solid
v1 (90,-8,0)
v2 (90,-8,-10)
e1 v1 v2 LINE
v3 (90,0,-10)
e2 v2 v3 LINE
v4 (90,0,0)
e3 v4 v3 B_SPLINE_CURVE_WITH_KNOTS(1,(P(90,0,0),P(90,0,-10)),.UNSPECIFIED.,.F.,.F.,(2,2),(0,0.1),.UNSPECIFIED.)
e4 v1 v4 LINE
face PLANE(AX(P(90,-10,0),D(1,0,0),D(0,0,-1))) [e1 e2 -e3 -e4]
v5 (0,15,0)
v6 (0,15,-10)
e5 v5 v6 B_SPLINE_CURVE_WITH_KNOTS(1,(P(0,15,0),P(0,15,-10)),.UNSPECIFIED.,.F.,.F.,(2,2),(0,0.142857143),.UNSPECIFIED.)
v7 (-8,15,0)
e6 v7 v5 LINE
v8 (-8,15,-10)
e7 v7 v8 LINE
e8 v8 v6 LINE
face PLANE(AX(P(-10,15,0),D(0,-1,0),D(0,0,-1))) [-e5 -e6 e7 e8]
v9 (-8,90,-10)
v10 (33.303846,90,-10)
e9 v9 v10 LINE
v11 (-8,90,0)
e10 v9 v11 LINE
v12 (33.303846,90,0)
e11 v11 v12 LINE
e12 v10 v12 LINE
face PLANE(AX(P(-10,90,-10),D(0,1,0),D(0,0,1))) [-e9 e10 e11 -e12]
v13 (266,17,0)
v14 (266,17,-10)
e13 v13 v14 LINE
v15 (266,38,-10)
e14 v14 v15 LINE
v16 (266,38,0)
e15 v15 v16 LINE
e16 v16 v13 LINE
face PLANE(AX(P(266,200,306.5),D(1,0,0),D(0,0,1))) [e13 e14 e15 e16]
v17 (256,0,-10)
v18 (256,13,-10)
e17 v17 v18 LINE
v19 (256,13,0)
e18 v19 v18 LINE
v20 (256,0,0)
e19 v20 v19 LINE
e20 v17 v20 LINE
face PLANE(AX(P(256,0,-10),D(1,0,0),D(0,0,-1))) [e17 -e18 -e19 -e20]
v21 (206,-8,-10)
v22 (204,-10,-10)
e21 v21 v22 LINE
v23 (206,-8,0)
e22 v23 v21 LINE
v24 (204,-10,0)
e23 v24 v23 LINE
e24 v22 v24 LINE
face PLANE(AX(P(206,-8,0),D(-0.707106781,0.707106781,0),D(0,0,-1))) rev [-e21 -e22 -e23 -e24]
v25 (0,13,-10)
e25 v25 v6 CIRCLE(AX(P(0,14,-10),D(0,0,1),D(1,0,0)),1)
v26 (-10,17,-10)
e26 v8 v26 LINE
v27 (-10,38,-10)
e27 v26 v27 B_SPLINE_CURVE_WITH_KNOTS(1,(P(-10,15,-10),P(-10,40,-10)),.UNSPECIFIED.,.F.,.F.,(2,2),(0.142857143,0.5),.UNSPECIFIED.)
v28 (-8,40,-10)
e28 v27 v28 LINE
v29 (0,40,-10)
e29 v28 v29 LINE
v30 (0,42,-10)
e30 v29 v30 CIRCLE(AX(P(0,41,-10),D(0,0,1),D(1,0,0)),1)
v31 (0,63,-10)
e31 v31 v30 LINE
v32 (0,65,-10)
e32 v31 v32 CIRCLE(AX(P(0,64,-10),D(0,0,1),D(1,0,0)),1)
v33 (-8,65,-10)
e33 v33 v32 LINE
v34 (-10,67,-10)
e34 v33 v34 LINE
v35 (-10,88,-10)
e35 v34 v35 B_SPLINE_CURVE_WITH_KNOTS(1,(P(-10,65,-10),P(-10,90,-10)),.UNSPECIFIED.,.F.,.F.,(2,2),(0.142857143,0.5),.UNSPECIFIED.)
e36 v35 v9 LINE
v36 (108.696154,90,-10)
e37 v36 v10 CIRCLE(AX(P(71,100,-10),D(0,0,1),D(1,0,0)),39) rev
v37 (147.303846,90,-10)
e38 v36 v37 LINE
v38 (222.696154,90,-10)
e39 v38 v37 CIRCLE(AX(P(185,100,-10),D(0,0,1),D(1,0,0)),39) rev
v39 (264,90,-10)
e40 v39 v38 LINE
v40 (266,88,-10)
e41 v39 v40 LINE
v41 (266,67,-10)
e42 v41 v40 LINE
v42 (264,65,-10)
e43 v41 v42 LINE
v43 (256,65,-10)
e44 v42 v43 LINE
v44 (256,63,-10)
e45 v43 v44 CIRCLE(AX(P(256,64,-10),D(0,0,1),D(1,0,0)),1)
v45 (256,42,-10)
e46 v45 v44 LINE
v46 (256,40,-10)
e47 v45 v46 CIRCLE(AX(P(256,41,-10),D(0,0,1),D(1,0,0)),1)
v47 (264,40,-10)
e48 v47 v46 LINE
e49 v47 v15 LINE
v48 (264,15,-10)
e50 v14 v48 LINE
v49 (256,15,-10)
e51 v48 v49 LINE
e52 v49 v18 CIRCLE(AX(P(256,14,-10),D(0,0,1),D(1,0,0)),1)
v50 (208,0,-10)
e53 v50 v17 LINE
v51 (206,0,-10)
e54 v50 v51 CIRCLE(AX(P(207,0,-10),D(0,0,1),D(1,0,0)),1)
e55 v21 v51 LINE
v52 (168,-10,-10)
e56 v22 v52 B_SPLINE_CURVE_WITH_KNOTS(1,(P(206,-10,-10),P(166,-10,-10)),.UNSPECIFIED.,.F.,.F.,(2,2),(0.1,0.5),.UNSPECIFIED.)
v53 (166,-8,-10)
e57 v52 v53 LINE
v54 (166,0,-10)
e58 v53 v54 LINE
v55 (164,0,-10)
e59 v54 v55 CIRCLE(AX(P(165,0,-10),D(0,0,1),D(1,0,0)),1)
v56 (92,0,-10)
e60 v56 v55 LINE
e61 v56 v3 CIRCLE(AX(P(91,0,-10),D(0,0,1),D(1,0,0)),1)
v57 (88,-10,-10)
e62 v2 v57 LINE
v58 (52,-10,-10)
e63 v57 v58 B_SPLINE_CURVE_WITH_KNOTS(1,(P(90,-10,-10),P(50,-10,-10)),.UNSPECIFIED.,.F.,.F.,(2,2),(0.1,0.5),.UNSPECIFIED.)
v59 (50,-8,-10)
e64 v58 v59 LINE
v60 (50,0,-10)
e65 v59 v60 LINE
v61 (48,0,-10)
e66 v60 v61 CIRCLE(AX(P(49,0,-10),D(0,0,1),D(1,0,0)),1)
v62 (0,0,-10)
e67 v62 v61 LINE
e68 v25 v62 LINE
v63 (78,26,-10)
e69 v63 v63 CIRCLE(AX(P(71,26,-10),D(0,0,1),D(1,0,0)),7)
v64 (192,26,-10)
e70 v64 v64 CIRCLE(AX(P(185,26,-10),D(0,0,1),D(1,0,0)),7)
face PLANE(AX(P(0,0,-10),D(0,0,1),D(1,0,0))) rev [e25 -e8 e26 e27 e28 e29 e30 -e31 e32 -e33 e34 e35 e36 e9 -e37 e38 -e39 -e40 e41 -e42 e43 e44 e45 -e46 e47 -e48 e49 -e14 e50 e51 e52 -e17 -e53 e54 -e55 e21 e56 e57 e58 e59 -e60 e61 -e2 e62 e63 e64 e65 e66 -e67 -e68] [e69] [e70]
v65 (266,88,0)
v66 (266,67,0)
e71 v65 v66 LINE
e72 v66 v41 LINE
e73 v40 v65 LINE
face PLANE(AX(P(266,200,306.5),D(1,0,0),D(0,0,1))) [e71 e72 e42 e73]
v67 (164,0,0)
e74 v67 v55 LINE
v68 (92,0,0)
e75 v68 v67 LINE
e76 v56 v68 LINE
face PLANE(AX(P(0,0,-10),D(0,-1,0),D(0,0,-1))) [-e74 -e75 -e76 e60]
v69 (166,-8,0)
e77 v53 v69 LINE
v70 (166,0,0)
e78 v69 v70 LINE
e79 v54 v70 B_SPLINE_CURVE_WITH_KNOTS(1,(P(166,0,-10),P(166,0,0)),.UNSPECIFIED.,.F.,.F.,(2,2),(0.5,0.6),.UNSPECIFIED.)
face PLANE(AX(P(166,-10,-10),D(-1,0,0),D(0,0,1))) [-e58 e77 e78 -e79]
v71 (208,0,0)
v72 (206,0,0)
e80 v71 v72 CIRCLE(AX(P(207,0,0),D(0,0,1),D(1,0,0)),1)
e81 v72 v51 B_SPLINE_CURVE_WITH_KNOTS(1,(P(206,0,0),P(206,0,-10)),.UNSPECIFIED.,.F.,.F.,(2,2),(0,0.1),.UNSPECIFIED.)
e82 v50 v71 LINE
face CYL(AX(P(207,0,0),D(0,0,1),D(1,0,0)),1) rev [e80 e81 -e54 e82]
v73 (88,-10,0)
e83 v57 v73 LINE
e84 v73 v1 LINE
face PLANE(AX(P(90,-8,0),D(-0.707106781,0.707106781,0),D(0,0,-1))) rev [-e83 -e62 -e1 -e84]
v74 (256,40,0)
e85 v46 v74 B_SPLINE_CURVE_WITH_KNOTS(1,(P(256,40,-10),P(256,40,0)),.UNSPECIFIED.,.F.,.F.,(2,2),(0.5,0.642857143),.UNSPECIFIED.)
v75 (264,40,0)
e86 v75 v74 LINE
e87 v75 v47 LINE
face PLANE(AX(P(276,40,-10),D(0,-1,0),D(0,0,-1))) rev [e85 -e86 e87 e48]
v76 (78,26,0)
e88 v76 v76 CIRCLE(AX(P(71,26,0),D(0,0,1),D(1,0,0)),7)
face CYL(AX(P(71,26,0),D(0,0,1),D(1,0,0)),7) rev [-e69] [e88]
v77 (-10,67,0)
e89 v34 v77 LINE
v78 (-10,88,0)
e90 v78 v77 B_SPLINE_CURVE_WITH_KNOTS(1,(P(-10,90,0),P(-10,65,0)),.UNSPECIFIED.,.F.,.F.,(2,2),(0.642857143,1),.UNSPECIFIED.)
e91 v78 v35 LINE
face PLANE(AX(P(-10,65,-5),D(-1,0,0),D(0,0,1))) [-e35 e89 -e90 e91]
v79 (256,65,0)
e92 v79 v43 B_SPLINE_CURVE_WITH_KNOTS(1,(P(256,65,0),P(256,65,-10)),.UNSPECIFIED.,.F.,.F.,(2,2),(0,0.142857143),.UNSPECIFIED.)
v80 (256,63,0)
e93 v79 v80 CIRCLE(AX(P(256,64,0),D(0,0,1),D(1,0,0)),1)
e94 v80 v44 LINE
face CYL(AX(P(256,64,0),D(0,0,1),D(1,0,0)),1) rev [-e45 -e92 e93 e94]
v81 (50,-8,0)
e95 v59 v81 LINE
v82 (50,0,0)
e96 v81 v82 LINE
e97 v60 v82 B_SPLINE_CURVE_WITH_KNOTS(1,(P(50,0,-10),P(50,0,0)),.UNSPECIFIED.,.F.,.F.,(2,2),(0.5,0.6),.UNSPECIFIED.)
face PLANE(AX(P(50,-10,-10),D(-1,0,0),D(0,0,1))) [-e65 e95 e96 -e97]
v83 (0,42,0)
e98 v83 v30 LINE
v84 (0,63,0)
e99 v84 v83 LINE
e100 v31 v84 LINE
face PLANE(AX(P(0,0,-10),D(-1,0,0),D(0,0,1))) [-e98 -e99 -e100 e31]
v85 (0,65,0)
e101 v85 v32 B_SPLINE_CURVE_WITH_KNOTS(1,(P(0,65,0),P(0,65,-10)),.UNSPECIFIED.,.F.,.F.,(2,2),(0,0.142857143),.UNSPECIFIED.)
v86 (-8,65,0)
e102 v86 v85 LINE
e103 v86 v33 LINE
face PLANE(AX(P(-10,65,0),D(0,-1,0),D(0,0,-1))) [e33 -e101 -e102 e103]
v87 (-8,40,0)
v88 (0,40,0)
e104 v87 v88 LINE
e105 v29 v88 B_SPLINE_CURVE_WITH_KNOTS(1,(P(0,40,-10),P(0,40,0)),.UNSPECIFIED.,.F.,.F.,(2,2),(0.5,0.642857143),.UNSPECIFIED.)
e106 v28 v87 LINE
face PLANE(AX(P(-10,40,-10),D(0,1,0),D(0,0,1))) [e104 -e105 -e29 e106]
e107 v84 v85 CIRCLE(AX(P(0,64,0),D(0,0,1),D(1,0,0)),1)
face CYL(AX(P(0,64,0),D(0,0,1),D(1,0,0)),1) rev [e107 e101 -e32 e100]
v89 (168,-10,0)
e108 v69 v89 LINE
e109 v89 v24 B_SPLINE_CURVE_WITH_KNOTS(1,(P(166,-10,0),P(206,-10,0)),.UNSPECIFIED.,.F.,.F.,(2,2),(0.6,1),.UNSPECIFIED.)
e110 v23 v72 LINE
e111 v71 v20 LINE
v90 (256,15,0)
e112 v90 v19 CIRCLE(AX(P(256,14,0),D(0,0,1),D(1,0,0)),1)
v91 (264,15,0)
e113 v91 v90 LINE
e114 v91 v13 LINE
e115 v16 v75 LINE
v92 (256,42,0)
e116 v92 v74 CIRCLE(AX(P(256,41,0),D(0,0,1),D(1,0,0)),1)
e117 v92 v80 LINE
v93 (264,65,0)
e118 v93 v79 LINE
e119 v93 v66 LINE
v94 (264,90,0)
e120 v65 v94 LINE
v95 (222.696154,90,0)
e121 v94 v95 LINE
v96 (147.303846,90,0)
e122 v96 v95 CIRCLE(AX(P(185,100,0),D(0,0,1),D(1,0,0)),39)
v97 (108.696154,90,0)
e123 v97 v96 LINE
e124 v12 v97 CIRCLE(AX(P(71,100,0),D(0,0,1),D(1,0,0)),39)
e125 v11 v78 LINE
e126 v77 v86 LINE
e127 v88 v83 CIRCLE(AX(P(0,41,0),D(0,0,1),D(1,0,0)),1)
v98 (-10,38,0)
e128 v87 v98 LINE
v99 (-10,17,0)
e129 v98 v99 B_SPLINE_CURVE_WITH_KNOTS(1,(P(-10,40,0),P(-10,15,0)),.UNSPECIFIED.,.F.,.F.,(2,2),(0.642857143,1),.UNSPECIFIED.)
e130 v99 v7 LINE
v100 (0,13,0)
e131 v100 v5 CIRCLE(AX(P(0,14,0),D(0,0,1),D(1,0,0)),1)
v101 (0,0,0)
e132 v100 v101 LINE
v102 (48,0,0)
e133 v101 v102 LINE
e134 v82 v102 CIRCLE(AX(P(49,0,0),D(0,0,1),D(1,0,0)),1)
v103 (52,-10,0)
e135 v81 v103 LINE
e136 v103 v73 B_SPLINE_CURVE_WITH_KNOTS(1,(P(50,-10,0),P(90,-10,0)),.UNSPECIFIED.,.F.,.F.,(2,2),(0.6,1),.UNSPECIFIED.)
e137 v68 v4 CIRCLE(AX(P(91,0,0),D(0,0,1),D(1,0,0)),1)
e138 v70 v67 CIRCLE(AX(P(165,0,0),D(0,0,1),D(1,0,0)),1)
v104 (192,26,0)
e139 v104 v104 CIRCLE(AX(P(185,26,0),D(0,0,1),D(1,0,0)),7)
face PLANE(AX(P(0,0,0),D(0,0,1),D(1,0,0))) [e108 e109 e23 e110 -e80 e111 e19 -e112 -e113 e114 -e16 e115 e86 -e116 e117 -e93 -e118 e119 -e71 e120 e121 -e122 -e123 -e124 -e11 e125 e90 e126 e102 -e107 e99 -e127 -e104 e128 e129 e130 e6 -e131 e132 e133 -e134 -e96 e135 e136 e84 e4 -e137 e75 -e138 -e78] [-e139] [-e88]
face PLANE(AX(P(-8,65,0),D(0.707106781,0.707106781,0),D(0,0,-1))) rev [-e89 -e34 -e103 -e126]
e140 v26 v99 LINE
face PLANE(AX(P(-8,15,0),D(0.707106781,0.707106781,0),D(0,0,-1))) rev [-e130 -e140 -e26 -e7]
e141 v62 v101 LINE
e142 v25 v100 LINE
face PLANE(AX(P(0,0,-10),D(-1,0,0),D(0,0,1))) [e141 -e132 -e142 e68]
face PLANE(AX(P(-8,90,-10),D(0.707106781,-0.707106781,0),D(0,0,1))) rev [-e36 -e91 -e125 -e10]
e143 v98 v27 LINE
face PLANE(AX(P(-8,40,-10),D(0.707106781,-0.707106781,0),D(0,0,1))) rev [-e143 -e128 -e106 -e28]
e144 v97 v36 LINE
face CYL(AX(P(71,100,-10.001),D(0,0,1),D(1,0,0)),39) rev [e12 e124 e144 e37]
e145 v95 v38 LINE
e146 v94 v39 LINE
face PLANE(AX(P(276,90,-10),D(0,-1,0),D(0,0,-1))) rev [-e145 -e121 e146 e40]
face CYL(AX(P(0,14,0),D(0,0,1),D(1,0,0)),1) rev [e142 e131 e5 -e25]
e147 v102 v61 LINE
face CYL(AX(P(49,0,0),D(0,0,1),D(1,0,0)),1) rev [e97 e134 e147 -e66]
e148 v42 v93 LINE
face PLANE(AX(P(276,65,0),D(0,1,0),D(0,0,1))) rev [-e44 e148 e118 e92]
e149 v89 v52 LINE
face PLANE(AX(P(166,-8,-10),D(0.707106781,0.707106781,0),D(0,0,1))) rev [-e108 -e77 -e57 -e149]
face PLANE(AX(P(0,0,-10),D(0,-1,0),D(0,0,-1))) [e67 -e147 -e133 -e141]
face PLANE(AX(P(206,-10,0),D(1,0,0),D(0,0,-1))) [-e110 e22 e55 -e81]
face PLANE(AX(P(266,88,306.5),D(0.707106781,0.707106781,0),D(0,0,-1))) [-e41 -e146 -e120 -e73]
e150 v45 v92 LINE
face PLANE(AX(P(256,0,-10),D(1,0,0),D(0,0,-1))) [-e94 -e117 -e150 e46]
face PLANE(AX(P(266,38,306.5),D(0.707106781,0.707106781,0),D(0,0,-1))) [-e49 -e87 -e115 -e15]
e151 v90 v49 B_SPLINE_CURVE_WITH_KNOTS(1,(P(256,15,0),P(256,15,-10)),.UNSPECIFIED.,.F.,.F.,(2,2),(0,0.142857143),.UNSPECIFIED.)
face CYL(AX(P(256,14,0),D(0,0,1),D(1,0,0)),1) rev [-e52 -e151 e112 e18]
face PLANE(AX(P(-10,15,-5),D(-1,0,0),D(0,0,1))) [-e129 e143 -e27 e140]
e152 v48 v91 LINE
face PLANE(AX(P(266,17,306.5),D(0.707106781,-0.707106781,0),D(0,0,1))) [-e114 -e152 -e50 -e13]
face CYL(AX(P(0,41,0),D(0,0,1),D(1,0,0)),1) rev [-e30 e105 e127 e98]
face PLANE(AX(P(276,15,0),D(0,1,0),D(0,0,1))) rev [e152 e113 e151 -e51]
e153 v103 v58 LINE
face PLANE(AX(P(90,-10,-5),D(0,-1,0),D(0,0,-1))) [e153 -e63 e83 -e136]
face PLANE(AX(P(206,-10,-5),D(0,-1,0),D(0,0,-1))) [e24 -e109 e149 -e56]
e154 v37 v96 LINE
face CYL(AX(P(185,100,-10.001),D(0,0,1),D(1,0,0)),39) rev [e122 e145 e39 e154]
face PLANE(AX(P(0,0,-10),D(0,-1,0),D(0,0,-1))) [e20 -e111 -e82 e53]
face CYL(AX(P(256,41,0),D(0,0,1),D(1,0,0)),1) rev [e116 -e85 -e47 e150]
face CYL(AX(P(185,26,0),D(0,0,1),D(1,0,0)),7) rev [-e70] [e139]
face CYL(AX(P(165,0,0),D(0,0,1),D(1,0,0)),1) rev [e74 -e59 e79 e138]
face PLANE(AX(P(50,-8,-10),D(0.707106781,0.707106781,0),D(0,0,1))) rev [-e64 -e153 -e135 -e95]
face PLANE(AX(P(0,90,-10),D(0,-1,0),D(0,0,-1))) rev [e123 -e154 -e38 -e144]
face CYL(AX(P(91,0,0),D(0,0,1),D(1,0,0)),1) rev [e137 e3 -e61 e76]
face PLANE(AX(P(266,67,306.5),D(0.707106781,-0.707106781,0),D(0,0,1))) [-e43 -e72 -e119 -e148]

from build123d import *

# Parameters (mm, degrees)
ESQUISSE1_W                               = 256
ESQUISSE1_H                               = 100
T_LE_DE_BASE_PLI_E1_DEPTH                 = 10
ENL_V_MAT_EXTRU_1_DEPTH                   = 10
TROU_POUR_TARAUDAGE_POUR_TROU_TARAUD_M1_D = 14
TAB_START                                 = -10
TAB_AND_SLOT_TAB1_DEPTH                   = 10
TAB_AND_SLOT_TAB2_DEPTH                   = 10
TAB_AND_SLOT_TAB3_DEPTH                   = 10
ESQUISSE17_W                              = 256
ESQUISSE17_H                              = 10
ENL_V_MAT_EXTRU_2_DEPTH                   = 10
DIAM_TRE_DU_PER_AGE_2_0_2_1_D             = 2


# Read off the part's stored shape, not the designer's step: Tab and Slot-Tab1, Tab and Slot-Tab2, Tab and Slot-Tab3
# Sheet-metal steps are written as plain solids
with BuildPart() as part:
    # Esquisse1 → Tôle de base pliée1 (new body)
    with BuildSketch(Plane.XY):
        with Locations((128, 50)):
            Rectangle(ESQUISSE1_W, ESQUISSE1_H)
    extrude(amount=-T_LE_DE_BASE_PLI_E1_DEPTH)

    # Esquisse9 → Enlèv. mat.-Extru.1 (cut)
    with BuildSketch(Plane.XY):
        with BuildLine():
            Line((32, 100), (110, 100))
            ThreePointArc((110, 100), (71, 139), (32, 100))
        make_face()
        with BuildLine():
            ThreePointArc((32, 100), (71, 61), (110, 100))
            Line((110, 100), (32, 100))
        make_face()
        with BuildLine():
            ThreePointArc((224, 100), (185, 139), (146, 100))
            Line((146, 100), (224, 100))
        make_face()
        with BuildLine():
            Line((224, 100), (146, 100))
            ThreePointArc((146, 100), (185, 61), (224, 100))
        make_face()
    extrude(amount=-ENL_V_MAT_EXTRU_1_DEPTH, mode=Mode.SUBTRACT)

    # Trou pour taraudage pour trou taraudé M161 (through all)
    with Locations(Plane.XY):
        with Locations((71, 26), (185, 26)):
            Hole(TROU_POUR_TARAUDAGE_POUR_TROU_TARAUD_M1_D / 2)

    # Tab and Slot-Tab1 outline → Tab and Slot-Tab1 (add)
    with BuildSketch(Plane.XY.offset(TAB_START)):
        Polygon((204, -10), (206, -8), (206, 0), (166, 0), (166, -8), (168, -10), align=None)
        Polygon((90, -8), (90, 0), (50, 0), (50, -8), (52, -10), (88, -10), align=None)
    extrude(amount=TAB_AND_SLOT_TAB1_DEPTH)

    # Tab and Slot-Tab2 outline → Tab and Slot-Tab2 (add)
    with BuildSketch(Plane.XY.offset(TAB_START)):
        Polygon((-10, 17), (-8, 15), (0, 15), (0, 40), (-8, 40), (-10, 38), align=None)
        Polygon((-8, 65), (0, 65), (0, 90), (-8, 90), (-10, 88), (-10, 67), align=None)
    extrude(amount=TAB_AND_SLOT_TAB2_DEPTH)

    # Tab and Slot-Tab3 outline → Tab and Slot-Tab3 (add)
    with BuildSketch(Plane.XY.offset(TAB_START)):
        Polygon((256, 90), (256, 65), (264, 65), (266, 67), (266, 88), (264, 90), align=None)
        Polygon((256, 15), (264, 15), (266, 17), (266, 38), (264, 40), (256, 40), align=None)
    extrude(amount=TAB_AND_SLOT_TAB3_DEPTH)

    # Esquisse17 → Enlèv. mat.-Extru.2 (cut)
    with BuildSketch(Plane.XY):
        with Locations((128, 95)):
            Rectangle(ESQUISSE17_W, ESQUISSE17_H)
    extrude(amount=-ENL_V_MAT_EXTRU_2_DEPTH, mode=Mode.SUBTRACT)

    # Diamètre du perçage Ø2.0 (2)1 (through all)
    with Locations(Plane.XY):
        with Locations((256, 64)):
            diam_tre_du_per_age_2_0_2_1 = Hole(DIAM_TRE_DU_PER_AGE_2_0_2_1_D / 2)

    # Répét. par esquisse1: Diamètre du perçage Ø2.0 (2)1 at 9 more places
    with Locations((-256, 0, 0), (-256, -23, 0), (-256, -50, 0), (-207, -64, 0), (-165, -64, 0), (-91, -64, 0), (-49, -64, 0), (0, -50, 0), (0, -23, 0)):
        add(diam_tre_du_per_age_2_0_2_1, mode=Mode.SUBTRACT)


solid = part.part
